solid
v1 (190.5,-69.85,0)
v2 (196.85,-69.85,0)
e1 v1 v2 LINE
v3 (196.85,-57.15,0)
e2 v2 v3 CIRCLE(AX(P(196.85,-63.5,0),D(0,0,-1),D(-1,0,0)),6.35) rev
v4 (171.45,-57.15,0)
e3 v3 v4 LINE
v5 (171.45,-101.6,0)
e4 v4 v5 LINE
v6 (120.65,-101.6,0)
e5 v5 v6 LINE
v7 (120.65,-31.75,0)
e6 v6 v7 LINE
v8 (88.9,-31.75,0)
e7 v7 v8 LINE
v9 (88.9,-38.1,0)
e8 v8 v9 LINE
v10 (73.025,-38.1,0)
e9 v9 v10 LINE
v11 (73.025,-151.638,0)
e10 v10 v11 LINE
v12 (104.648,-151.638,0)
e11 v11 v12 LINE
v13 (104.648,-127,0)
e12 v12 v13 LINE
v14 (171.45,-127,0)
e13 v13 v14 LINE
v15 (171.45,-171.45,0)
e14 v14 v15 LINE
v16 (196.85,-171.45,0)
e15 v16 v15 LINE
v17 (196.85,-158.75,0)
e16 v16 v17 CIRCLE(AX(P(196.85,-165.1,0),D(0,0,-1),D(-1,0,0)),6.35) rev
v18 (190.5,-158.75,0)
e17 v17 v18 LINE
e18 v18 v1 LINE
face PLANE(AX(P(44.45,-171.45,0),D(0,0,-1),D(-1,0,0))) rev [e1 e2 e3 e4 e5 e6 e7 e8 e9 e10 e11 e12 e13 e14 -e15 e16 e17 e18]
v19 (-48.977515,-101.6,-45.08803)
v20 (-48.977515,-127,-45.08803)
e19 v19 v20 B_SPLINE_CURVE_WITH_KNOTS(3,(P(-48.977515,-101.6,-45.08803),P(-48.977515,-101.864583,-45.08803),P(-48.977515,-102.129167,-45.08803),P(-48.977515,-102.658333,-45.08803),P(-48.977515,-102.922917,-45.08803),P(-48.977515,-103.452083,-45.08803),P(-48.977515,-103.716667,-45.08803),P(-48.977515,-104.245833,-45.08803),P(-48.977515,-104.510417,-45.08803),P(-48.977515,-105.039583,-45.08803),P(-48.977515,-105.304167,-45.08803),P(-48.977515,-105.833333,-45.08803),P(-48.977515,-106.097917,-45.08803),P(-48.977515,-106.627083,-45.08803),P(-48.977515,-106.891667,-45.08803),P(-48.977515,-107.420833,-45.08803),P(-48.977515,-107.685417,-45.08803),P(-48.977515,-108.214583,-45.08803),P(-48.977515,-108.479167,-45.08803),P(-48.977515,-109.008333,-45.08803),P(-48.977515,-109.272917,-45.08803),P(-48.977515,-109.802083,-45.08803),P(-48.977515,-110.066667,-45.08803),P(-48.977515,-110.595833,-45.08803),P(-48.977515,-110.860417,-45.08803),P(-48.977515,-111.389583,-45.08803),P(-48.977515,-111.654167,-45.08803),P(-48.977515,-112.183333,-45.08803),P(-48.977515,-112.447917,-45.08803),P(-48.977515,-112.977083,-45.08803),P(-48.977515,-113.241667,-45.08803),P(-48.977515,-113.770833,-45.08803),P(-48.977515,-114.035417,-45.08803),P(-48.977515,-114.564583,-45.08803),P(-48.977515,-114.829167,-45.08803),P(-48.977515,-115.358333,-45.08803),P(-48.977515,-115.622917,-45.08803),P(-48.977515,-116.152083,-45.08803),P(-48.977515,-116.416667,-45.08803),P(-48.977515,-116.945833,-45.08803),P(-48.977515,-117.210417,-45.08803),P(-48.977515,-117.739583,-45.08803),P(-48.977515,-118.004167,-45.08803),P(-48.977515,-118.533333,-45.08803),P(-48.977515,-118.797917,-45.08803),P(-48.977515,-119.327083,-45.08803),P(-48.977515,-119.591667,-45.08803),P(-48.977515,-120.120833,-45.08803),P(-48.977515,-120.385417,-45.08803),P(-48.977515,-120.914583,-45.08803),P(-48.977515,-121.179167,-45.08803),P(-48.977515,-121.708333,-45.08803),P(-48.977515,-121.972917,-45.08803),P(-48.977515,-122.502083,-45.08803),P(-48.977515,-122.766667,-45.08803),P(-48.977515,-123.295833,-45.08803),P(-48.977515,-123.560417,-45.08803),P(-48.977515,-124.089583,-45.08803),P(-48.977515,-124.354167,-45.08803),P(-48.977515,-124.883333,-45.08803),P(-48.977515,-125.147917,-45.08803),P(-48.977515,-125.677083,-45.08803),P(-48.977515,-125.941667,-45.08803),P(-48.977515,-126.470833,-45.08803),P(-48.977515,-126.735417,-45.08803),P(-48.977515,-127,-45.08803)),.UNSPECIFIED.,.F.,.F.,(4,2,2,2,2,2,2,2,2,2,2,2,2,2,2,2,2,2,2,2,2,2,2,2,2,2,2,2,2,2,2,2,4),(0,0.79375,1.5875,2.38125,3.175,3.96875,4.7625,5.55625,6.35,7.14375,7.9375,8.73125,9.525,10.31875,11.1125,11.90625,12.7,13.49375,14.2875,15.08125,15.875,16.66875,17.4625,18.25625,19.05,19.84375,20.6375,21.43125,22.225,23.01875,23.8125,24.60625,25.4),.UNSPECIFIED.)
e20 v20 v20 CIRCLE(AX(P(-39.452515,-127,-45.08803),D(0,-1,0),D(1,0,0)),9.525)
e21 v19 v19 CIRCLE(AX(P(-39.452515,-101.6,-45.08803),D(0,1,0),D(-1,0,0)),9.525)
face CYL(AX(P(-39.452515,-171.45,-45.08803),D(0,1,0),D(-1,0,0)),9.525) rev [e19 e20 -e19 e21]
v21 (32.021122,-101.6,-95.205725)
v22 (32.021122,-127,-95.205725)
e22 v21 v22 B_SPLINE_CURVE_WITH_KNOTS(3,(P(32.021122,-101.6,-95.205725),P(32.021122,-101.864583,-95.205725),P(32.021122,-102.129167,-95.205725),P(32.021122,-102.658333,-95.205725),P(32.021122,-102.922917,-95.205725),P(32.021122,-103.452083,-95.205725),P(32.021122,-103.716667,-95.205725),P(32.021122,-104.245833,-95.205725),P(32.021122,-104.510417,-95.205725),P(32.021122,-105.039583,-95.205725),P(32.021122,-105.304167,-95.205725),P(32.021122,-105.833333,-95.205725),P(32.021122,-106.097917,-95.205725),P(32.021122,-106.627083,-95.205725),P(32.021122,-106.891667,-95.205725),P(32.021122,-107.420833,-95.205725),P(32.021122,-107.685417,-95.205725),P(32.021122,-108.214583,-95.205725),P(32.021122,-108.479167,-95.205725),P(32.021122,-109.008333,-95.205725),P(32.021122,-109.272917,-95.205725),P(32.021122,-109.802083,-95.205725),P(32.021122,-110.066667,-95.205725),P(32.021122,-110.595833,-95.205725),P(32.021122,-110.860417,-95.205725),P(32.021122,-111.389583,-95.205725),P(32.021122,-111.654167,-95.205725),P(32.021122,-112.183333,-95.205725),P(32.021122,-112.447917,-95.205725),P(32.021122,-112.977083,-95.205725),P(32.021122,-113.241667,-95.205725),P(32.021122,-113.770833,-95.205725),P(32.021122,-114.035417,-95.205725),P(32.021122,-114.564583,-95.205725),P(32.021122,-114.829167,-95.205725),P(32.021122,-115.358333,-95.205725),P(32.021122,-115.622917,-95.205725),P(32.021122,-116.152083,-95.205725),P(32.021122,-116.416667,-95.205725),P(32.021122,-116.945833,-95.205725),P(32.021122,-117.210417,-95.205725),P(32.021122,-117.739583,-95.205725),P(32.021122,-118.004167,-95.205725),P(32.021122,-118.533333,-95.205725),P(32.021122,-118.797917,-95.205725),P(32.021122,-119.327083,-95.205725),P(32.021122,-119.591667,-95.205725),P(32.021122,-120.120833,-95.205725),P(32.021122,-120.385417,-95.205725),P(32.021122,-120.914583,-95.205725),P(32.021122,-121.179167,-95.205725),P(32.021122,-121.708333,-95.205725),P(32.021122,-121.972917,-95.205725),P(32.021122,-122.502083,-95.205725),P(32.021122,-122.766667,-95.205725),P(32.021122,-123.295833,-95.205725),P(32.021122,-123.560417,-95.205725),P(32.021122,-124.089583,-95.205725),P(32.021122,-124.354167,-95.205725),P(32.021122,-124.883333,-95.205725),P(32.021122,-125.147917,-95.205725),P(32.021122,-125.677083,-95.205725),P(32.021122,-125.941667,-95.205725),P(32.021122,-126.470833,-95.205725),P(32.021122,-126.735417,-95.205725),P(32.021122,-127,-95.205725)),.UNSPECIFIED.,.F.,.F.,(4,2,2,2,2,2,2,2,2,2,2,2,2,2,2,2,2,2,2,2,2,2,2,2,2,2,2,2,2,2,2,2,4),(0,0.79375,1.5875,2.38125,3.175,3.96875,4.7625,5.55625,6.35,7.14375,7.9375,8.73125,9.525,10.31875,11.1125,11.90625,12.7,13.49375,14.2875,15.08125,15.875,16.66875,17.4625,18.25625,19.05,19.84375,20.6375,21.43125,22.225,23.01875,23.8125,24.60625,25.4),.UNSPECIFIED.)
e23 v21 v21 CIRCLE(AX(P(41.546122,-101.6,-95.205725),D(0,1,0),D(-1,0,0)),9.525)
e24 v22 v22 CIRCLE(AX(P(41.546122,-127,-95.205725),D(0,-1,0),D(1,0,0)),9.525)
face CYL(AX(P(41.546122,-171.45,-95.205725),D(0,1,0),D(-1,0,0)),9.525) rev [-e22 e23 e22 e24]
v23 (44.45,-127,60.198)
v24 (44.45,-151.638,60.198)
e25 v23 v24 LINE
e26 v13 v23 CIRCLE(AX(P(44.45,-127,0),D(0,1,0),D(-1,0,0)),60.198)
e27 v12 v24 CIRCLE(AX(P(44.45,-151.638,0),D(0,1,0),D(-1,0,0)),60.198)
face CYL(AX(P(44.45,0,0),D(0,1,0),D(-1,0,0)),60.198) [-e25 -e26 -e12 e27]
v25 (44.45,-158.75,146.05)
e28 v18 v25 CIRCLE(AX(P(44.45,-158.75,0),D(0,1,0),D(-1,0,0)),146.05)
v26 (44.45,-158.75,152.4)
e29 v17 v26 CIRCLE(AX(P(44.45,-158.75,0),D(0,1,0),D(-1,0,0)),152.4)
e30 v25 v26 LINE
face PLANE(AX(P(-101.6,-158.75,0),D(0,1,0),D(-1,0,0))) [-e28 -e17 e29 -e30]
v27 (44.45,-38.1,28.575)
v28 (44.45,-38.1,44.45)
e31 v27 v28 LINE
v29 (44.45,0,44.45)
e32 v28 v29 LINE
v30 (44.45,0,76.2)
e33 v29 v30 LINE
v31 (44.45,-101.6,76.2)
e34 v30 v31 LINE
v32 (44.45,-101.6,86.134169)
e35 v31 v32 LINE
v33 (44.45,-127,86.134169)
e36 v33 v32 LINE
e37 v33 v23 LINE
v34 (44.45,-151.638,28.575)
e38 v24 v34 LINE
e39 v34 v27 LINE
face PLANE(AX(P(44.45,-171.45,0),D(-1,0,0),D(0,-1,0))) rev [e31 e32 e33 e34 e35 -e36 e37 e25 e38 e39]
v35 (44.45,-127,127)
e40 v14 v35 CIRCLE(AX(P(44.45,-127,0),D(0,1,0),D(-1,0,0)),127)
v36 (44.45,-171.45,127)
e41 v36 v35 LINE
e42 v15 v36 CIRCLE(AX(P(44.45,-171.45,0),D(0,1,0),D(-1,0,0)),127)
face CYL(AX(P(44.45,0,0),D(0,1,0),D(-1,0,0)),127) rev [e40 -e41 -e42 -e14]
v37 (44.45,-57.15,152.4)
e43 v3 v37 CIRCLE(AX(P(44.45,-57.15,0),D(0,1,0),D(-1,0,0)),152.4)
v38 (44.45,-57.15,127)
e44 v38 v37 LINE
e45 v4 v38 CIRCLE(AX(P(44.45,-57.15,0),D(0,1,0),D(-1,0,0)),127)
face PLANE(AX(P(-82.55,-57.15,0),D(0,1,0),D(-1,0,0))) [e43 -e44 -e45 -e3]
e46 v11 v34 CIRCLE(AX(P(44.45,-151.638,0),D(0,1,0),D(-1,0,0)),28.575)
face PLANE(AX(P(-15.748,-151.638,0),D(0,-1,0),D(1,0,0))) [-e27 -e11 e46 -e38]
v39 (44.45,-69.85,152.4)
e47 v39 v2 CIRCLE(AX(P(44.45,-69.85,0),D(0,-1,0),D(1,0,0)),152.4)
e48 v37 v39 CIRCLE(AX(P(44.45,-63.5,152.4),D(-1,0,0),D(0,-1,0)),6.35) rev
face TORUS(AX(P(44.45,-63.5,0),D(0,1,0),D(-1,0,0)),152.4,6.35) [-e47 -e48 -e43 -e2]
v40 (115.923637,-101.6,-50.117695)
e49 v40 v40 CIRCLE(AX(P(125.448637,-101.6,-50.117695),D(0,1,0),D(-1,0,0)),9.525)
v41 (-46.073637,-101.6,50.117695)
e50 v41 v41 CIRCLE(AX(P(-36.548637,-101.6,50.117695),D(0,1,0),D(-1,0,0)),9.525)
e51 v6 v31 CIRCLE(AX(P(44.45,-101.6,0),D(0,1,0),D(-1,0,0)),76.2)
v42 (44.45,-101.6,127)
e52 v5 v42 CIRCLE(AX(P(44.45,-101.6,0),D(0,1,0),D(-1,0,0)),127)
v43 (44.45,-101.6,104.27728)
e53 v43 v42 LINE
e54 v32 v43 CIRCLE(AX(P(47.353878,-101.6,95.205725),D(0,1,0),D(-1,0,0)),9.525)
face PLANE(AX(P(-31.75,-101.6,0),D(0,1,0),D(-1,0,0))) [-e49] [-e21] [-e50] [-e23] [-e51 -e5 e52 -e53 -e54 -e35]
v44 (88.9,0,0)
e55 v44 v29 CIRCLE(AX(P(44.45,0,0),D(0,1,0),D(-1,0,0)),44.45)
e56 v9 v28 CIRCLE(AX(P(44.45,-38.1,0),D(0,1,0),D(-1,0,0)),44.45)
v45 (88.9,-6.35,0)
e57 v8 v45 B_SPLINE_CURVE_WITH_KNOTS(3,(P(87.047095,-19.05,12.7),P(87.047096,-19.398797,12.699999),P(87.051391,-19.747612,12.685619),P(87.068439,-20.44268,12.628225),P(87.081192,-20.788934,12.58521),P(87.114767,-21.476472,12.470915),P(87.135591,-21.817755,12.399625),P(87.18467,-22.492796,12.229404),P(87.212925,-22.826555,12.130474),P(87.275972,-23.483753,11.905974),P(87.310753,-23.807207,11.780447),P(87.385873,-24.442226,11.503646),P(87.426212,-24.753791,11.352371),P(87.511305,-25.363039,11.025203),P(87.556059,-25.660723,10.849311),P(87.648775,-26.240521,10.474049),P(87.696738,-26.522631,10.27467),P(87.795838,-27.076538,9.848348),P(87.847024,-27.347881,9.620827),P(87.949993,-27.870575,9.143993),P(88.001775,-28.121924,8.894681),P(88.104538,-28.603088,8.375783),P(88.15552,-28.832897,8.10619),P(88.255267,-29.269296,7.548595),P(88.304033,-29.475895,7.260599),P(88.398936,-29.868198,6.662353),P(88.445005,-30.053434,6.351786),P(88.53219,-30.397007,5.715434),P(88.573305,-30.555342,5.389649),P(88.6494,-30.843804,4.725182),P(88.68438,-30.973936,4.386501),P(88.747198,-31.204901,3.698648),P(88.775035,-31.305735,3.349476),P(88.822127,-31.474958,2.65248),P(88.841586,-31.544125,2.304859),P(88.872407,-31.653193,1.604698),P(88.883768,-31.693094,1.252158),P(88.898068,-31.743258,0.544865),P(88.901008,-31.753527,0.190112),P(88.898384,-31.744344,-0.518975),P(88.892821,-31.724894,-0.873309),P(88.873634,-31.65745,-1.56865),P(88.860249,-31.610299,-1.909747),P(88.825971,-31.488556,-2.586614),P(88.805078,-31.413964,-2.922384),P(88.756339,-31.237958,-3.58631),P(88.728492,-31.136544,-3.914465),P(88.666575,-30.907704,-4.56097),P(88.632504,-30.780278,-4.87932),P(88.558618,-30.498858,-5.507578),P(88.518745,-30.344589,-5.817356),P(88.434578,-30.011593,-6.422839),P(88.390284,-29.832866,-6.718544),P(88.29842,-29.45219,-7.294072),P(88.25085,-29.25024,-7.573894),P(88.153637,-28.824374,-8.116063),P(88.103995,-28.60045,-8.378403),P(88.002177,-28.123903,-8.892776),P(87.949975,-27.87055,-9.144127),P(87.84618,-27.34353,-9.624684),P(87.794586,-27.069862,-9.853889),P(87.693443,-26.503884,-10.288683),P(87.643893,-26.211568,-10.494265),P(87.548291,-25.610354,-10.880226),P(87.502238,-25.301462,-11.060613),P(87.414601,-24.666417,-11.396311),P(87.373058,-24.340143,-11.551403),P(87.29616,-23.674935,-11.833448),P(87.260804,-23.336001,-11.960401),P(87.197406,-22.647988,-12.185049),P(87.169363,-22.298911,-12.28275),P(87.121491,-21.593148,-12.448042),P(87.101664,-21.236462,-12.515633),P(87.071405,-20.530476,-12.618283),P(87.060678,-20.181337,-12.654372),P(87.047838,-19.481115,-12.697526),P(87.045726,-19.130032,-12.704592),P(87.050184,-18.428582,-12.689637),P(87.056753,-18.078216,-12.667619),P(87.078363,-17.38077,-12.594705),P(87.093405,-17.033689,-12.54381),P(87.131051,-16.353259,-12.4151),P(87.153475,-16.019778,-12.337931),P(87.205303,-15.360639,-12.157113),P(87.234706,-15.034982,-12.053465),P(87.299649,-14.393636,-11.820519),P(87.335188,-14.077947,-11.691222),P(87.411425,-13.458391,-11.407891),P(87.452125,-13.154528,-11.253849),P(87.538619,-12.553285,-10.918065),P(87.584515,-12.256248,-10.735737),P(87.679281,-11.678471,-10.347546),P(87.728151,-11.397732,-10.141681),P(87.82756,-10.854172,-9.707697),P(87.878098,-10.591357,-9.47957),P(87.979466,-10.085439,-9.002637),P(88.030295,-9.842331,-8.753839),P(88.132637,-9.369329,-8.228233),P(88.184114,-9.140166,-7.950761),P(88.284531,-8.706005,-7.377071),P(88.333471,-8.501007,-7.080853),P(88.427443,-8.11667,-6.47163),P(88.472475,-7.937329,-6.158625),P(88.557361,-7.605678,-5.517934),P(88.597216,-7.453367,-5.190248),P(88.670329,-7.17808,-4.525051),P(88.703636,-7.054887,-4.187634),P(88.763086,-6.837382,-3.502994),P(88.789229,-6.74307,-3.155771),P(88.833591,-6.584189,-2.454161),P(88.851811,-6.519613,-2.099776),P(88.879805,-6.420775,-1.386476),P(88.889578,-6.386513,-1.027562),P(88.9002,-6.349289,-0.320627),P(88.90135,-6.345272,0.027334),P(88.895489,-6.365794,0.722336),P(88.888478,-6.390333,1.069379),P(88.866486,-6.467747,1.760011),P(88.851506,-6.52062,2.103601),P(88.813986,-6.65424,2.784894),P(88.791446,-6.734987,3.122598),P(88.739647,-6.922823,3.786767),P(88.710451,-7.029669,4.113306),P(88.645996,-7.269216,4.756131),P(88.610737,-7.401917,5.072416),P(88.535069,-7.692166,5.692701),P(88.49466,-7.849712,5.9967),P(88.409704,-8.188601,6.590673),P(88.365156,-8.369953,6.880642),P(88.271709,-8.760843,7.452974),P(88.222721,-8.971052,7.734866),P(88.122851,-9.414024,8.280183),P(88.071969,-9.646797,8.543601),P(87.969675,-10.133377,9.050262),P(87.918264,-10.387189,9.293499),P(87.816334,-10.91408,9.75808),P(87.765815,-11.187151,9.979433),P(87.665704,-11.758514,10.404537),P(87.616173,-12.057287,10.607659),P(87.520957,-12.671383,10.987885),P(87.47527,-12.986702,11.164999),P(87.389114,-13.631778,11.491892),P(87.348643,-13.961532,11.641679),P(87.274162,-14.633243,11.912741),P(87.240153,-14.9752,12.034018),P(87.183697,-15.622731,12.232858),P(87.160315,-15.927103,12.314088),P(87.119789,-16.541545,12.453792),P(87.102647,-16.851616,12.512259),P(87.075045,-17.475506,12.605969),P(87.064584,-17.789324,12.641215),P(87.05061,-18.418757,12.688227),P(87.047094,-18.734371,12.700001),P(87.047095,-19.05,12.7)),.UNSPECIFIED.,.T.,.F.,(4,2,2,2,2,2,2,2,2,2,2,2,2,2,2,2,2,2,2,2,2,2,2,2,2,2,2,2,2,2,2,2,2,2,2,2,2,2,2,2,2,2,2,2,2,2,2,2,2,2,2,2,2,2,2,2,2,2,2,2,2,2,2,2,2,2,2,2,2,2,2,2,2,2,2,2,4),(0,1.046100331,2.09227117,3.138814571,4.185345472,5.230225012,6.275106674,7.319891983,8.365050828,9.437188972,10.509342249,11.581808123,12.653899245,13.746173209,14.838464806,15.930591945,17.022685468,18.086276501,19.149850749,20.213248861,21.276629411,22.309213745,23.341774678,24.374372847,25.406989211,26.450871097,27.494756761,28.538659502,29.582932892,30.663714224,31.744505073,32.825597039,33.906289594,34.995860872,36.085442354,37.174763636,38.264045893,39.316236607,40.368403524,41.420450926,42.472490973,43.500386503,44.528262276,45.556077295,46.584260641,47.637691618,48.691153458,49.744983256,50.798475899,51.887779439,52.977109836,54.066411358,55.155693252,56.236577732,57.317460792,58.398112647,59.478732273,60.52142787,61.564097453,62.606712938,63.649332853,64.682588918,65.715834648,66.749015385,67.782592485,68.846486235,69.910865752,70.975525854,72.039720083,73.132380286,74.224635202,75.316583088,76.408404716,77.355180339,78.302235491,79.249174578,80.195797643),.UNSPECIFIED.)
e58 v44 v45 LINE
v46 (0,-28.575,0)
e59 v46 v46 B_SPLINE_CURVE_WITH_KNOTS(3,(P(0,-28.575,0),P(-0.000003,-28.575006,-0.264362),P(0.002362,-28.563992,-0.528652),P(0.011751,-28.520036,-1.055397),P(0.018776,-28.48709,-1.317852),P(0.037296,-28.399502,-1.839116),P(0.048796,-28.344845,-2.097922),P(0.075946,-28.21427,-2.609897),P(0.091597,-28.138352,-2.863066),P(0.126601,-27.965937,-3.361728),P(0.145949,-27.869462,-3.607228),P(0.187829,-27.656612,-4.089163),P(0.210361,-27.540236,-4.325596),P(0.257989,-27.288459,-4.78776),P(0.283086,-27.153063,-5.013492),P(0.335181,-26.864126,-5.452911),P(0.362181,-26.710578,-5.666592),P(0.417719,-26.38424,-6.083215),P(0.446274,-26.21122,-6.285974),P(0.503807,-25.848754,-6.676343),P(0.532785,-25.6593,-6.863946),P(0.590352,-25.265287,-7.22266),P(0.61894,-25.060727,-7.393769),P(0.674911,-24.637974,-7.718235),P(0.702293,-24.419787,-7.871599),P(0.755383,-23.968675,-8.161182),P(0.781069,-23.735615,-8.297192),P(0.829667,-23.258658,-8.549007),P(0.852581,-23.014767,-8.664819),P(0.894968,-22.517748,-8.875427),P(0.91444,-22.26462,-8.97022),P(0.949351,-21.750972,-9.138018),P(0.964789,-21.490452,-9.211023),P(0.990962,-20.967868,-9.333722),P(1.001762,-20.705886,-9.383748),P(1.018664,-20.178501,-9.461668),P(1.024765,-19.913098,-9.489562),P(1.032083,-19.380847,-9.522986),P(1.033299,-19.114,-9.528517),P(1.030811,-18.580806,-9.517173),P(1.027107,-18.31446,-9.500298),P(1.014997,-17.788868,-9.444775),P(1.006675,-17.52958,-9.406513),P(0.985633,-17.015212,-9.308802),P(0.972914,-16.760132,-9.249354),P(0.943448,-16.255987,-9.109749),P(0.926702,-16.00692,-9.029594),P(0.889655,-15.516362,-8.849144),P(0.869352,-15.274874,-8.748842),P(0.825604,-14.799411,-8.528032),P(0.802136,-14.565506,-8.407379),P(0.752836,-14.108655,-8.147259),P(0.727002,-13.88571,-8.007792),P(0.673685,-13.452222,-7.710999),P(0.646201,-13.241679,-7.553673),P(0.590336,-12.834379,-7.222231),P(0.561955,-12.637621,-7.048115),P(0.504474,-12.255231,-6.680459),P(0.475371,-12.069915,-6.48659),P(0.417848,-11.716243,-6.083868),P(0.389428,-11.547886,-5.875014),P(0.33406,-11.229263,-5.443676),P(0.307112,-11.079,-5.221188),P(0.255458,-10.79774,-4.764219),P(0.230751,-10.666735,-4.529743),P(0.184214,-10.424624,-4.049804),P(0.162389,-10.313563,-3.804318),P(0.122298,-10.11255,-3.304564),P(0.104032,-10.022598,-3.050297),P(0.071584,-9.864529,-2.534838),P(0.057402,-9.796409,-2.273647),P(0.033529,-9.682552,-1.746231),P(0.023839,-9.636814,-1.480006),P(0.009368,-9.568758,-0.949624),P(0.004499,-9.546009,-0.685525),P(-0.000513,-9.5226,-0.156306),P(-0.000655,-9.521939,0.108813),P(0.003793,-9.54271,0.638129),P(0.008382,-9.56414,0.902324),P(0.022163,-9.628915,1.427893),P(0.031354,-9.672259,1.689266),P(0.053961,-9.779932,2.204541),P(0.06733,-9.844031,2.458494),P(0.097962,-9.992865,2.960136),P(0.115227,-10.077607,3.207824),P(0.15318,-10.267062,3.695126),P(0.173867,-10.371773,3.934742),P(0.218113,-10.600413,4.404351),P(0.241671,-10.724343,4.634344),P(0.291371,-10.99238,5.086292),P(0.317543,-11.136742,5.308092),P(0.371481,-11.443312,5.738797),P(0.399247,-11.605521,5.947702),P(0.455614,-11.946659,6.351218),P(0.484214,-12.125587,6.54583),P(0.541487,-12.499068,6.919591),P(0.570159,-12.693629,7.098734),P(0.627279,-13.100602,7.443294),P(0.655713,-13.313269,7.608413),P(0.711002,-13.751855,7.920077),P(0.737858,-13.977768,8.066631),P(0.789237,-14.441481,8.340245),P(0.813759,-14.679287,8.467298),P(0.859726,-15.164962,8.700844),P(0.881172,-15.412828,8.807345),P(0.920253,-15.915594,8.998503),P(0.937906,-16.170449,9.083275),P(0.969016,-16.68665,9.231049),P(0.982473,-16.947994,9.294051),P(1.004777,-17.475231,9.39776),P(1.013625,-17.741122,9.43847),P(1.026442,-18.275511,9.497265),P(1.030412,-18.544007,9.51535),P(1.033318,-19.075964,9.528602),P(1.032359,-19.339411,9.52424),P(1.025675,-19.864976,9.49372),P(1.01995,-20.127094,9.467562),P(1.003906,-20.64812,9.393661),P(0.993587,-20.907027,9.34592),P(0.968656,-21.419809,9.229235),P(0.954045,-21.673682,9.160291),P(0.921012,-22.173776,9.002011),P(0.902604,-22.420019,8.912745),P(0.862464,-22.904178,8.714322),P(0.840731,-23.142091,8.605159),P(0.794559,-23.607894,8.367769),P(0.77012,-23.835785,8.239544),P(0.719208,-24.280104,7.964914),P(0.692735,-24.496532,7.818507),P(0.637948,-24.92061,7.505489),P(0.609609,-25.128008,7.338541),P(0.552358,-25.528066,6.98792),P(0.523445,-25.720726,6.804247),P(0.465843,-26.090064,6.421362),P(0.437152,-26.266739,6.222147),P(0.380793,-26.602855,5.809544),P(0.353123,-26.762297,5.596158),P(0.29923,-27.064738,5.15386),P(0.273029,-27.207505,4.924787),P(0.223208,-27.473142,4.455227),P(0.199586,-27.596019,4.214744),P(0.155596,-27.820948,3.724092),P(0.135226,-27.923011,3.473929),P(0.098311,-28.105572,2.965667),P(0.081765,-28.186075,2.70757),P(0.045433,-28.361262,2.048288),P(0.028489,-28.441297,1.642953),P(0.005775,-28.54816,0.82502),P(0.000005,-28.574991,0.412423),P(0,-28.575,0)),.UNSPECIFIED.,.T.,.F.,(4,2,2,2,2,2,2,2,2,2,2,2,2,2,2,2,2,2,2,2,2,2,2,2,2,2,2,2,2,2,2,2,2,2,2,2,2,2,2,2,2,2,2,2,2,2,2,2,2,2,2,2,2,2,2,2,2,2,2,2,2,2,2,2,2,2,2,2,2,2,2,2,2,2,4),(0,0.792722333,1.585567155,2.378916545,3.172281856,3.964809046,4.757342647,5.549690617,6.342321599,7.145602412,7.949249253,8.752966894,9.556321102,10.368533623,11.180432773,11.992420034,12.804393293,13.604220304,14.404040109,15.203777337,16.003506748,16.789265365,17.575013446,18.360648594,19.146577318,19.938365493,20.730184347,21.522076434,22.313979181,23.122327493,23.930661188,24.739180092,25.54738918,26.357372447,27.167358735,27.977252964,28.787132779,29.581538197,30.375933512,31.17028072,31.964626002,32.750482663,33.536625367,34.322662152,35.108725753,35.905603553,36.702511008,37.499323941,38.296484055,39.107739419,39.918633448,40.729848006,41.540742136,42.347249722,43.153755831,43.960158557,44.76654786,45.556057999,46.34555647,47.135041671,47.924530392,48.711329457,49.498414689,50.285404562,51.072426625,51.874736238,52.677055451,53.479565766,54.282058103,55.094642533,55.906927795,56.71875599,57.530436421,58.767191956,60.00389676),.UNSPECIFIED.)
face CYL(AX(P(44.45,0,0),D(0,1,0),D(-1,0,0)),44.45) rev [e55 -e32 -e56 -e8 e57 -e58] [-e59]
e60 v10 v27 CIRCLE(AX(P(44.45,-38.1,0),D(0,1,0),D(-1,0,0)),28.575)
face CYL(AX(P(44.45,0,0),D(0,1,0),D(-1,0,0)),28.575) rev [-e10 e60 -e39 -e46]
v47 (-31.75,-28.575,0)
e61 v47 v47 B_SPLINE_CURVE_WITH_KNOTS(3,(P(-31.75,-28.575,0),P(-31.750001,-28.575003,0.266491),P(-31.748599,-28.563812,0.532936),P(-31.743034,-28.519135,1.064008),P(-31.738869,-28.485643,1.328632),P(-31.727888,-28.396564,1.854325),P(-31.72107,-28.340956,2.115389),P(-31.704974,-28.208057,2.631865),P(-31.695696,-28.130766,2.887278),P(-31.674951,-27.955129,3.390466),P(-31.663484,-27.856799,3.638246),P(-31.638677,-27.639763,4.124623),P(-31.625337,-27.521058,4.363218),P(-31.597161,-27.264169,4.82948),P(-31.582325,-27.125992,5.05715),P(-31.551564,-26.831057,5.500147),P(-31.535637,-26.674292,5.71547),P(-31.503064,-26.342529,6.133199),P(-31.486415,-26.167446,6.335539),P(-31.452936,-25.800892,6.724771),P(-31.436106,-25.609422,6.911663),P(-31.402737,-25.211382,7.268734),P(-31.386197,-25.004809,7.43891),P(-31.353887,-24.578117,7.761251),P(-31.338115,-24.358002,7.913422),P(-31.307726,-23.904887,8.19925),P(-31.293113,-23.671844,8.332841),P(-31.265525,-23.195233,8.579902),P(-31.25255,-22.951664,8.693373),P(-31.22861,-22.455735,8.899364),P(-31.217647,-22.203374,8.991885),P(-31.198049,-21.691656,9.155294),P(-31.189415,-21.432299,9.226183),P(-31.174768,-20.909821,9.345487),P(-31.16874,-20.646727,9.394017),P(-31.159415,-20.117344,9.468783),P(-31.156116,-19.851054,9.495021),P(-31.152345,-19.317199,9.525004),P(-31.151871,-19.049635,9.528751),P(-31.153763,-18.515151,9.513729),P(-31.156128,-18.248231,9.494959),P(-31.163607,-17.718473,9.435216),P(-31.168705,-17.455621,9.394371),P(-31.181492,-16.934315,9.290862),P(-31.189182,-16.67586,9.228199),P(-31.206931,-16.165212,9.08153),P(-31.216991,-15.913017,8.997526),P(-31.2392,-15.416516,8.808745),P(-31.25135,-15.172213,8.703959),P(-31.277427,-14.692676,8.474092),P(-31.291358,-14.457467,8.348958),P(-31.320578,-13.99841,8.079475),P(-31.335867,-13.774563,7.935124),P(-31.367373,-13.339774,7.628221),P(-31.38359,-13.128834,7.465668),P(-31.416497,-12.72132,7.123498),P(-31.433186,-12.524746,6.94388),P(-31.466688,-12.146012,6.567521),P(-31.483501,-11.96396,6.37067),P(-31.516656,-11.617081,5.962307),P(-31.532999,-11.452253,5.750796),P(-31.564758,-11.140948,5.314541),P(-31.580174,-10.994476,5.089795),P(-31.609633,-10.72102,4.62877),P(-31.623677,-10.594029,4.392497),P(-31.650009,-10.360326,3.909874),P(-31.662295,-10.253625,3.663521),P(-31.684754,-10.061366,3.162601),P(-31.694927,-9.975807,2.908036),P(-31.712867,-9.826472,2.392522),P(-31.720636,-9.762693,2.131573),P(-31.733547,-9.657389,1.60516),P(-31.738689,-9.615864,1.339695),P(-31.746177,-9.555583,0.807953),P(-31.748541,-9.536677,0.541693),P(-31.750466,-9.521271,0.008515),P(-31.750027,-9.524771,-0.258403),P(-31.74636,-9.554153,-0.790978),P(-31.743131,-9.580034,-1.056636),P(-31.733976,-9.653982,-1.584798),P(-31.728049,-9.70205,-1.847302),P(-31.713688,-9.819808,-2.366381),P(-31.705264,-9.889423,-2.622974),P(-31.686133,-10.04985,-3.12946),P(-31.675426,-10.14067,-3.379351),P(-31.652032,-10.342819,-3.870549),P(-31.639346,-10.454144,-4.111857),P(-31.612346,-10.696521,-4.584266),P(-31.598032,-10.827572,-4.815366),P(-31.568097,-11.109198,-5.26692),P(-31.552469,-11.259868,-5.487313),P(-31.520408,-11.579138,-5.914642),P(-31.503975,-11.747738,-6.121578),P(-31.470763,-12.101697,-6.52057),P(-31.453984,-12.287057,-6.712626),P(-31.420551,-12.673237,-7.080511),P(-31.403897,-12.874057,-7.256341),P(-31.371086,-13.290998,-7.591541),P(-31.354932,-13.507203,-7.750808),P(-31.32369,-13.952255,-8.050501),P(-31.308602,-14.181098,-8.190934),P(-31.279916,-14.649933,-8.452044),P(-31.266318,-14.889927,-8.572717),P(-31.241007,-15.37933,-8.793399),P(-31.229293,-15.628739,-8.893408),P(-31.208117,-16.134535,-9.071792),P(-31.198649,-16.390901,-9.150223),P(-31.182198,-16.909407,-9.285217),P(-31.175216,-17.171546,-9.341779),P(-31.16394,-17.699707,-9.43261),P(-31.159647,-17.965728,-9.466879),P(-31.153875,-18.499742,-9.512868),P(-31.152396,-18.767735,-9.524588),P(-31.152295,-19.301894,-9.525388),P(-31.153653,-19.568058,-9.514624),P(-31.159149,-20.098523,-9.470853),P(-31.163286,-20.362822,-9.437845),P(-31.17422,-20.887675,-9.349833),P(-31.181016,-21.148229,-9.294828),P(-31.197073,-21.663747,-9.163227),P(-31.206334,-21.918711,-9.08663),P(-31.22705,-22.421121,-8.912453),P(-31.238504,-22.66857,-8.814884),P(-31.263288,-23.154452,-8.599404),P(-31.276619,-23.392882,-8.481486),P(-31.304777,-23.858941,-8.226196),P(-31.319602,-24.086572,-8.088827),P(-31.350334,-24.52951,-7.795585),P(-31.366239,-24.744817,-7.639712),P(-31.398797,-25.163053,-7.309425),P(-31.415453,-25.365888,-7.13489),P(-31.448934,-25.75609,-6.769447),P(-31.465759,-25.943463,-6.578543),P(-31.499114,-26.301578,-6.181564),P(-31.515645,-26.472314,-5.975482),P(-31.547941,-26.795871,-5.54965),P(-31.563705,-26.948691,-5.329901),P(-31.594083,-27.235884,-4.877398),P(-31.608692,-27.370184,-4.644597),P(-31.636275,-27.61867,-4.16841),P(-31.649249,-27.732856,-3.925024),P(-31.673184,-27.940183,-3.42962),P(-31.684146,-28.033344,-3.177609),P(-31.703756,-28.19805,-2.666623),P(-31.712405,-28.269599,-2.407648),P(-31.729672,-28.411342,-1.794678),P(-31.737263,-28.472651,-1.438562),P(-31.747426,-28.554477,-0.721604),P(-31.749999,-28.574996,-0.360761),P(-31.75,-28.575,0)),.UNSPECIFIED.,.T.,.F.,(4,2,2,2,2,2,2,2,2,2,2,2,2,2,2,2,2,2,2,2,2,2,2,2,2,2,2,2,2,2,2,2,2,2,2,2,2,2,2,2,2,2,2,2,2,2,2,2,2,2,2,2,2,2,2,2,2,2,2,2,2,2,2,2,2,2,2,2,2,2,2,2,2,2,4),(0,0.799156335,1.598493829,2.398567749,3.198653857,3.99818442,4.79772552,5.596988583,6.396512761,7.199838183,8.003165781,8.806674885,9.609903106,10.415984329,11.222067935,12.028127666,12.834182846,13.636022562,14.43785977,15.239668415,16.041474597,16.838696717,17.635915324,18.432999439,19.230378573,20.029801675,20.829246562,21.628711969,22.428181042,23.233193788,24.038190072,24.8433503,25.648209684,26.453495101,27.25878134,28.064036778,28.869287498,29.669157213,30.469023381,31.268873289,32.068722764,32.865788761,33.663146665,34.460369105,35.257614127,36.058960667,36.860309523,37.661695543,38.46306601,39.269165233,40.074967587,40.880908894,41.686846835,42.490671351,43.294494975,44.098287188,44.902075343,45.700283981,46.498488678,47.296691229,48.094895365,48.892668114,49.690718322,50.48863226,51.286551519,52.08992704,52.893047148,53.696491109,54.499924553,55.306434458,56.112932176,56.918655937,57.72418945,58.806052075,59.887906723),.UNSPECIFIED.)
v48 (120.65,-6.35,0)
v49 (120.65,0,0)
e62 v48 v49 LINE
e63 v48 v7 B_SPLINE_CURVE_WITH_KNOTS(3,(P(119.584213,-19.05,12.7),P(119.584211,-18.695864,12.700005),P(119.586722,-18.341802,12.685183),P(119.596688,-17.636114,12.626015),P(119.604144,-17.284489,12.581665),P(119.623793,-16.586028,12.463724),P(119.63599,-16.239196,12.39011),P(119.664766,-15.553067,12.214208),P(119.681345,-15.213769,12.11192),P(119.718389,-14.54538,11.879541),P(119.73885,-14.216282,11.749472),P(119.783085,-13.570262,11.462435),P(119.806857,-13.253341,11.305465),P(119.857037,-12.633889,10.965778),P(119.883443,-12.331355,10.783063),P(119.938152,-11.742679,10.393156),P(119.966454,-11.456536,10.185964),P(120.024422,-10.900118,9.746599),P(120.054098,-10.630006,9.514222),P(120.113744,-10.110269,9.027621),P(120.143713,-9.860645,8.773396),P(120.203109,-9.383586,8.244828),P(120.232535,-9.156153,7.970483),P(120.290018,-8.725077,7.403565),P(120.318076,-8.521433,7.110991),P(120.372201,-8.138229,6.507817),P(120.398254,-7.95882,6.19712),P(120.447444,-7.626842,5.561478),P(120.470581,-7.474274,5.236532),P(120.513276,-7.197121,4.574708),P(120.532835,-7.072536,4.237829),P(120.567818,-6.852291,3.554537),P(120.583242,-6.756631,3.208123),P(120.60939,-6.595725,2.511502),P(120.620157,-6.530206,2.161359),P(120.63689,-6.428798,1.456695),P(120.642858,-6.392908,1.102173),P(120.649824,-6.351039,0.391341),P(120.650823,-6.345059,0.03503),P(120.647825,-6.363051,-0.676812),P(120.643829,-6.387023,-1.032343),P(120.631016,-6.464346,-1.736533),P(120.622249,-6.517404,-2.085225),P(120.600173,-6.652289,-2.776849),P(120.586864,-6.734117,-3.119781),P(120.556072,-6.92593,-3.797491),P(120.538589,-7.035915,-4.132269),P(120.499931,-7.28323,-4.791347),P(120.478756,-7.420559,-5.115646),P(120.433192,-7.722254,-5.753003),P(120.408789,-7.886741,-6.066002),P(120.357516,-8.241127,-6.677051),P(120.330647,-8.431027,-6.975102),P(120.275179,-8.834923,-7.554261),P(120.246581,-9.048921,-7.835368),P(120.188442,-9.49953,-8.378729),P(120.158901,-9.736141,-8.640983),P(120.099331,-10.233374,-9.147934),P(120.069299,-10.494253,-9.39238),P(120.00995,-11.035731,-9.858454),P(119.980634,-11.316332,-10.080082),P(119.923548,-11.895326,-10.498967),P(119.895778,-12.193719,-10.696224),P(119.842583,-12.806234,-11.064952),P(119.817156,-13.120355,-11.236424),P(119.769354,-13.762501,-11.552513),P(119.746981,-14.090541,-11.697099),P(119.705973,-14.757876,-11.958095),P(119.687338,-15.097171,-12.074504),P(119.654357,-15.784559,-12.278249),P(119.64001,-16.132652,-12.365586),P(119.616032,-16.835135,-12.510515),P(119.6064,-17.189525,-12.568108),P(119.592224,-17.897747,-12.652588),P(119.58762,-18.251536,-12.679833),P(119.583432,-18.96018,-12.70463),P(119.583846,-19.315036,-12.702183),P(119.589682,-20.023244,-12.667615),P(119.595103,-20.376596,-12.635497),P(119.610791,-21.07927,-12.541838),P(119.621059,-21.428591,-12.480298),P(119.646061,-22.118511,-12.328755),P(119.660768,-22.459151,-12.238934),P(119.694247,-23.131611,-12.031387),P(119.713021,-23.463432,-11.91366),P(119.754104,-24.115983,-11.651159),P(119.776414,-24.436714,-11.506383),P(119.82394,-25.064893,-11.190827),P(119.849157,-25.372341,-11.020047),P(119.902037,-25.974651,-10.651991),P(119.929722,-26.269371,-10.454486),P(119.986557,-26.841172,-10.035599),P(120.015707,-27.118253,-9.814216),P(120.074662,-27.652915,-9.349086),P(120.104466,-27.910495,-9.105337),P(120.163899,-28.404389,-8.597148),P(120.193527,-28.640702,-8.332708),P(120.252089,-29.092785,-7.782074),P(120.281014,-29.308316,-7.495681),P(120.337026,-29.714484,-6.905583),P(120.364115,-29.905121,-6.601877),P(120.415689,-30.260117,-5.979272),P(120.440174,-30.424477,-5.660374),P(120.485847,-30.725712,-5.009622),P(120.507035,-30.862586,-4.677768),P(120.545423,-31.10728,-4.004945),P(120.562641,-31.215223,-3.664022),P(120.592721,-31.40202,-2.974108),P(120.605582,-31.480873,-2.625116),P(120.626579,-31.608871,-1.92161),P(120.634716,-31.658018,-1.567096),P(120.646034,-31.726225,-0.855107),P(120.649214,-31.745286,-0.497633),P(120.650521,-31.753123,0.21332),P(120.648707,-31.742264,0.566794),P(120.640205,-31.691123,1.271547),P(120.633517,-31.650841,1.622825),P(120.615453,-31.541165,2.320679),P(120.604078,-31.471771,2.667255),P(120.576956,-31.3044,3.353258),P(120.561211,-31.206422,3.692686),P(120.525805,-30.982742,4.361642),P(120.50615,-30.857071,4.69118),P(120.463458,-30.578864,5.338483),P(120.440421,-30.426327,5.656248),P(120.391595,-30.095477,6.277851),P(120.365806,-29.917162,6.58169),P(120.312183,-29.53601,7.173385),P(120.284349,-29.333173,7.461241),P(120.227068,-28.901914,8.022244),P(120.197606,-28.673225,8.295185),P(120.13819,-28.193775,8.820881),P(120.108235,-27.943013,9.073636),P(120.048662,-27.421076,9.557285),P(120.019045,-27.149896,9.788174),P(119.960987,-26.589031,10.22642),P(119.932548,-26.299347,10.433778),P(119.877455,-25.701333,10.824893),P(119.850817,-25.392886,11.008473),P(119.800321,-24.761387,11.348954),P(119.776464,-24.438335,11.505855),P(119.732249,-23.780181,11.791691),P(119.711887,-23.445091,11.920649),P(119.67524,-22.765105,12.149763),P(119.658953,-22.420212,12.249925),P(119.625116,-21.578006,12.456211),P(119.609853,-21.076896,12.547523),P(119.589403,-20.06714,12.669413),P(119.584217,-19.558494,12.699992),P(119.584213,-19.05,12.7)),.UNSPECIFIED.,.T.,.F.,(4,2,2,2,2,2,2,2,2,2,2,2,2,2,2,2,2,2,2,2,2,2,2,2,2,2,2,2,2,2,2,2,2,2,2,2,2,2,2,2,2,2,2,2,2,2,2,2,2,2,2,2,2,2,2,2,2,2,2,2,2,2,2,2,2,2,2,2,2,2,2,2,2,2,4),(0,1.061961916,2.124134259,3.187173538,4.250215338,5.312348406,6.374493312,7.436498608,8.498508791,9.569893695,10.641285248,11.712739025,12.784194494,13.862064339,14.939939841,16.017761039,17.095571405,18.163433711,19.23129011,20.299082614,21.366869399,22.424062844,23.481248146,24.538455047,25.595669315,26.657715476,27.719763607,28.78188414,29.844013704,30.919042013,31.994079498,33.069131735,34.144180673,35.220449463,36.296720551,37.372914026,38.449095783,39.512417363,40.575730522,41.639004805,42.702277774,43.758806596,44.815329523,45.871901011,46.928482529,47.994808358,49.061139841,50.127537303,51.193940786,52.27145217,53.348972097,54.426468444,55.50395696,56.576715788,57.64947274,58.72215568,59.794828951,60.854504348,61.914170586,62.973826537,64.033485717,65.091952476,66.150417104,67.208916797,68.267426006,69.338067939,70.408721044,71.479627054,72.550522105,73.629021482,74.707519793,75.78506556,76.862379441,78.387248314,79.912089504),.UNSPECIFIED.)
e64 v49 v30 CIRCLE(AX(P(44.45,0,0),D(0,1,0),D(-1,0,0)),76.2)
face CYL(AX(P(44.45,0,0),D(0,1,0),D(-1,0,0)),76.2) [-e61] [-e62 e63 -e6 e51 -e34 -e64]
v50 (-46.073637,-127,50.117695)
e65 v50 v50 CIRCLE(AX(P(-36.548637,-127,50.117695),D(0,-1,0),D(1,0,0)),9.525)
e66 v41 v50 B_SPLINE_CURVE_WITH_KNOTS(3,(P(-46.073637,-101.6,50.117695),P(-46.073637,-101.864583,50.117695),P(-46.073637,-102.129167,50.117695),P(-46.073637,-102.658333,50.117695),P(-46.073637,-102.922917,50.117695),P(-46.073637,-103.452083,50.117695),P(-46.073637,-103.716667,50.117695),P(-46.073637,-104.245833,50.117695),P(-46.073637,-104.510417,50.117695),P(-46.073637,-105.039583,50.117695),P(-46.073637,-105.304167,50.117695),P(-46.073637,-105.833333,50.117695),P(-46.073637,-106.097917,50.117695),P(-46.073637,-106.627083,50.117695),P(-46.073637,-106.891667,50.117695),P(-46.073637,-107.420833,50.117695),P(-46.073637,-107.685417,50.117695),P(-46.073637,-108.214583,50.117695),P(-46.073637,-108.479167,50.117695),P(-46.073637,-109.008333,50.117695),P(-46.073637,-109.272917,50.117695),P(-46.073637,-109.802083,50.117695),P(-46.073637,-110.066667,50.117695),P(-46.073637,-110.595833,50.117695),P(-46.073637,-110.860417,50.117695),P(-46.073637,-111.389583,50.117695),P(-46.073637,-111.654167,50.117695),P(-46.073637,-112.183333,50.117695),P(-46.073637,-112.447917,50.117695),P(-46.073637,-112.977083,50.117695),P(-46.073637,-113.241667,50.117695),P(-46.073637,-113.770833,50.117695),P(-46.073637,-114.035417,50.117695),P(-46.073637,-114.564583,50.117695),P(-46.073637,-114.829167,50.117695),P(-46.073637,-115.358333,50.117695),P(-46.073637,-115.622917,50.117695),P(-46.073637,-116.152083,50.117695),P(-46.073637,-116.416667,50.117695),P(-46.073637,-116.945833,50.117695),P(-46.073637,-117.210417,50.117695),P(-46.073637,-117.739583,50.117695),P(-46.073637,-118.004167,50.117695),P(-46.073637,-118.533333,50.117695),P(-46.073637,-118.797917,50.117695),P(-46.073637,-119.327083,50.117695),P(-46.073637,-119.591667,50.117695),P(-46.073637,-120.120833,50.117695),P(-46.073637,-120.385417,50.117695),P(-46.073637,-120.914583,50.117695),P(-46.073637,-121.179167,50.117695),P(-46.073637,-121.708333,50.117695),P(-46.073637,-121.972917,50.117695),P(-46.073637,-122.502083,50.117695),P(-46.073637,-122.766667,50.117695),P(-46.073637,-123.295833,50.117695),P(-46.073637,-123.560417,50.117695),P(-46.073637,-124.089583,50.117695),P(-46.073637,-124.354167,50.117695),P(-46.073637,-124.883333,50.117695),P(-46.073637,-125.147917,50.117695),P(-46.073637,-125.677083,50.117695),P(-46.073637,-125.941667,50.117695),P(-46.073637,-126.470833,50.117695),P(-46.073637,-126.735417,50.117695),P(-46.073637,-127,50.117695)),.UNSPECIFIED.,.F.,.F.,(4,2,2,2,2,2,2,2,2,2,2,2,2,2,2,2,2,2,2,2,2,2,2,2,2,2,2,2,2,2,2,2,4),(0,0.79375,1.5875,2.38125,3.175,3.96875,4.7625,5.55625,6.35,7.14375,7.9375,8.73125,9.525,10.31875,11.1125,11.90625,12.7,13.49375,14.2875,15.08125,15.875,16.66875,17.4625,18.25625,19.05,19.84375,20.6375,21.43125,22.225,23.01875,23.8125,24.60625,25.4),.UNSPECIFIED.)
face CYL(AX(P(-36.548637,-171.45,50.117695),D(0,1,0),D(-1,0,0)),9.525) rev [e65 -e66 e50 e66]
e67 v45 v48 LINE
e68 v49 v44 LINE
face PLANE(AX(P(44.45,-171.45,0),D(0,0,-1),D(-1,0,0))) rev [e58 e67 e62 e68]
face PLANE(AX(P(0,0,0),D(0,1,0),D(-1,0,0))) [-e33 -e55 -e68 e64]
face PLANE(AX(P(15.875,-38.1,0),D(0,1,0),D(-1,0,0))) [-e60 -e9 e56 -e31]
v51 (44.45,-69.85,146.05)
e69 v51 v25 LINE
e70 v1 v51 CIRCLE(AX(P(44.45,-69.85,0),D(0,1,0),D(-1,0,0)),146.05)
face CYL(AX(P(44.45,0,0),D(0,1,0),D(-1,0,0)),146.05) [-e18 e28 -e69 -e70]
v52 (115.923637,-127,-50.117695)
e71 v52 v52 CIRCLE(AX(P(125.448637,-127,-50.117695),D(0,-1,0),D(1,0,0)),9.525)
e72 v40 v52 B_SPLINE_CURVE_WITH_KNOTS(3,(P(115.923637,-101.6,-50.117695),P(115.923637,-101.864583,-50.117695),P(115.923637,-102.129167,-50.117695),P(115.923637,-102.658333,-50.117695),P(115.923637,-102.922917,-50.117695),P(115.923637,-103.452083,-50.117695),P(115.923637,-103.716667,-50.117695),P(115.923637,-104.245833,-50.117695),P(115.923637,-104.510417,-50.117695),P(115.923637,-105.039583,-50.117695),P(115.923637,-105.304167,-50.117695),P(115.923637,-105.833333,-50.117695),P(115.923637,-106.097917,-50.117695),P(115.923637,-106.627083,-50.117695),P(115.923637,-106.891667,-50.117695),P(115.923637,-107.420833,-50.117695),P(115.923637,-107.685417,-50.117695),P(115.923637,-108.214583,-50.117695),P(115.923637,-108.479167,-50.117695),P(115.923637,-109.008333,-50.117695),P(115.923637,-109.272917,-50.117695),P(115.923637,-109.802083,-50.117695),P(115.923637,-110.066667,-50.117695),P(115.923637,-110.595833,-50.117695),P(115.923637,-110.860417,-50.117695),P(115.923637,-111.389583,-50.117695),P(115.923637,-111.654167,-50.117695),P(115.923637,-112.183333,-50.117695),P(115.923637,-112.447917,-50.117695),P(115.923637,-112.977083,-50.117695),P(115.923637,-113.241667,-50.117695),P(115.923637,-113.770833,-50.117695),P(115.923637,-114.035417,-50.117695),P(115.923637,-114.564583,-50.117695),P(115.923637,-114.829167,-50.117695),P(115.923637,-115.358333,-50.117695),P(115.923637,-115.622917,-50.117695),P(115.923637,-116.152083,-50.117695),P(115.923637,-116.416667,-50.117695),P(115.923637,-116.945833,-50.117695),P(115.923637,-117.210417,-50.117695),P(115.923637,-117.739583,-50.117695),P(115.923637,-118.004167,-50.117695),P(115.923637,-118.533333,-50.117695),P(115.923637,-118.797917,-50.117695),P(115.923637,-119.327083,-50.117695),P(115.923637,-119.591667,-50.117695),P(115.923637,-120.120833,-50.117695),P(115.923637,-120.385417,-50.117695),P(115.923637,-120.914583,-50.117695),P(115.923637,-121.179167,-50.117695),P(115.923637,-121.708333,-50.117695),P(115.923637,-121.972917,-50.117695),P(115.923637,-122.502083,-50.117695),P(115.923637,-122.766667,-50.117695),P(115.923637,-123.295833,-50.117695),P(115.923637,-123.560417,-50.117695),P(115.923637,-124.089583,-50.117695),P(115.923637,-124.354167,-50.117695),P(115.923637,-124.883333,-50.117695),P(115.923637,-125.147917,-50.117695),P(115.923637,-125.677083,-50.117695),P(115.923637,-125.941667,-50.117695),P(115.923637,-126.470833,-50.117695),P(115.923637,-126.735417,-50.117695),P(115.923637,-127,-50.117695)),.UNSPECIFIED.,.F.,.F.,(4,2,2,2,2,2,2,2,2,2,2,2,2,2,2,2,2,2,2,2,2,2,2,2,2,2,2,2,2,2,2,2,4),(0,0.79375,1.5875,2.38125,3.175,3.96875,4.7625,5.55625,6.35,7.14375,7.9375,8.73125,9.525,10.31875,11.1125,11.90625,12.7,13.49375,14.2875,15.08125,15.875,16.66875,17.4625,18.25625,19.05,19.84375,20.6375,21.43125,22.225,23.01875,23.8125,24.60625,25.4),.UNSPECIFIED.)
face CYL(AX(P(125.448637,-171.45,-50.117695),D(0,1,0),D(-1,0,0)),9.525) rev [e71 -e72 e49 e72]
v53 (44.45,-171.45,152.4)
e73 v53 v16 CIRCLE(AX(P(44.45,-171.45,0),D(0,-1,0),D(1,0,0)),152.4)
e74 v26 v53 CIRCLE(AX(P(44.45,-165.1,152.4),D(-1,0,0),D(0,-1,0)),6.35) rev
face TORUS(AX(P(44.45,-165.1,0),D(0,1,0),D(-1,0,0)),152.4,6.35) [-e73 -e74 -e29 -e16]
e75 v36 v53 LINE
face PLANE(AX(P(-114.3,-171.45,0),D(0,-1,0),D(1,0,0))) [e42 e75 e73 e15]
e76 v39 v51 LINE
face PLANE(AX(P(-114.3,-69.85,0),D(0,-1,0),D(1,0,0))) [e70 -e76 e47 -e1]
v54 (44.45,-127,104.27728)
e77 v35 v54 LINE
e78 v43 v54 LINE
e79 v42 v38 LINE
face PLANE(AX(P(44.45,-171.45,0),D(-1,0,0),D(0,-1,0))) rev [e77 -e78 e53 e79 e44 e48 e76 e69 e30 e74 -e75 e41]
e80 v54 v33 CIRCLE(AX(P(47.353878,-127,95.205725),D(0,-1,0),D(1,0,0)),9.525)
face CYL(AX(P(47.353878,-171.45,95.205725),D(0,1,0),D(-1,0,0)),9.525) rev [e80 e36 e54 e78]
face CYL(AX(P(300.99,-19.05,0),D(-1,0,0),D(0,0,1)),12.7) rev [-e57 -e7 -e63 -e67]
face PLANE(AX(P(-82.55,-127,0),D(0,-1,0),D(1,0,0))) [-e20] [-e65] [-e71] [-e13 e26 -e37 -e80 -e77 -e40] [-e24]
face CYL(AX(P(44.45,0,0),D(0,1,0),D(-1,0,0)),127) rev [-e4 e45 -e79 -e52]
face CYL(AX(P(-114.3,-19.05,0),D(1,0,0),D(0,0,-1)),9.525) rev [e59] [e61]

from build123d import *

# Parameters (mm, degrees)
FILLET2_R                = 6.35
FILLET3_R                = 6.35
CUT_EXTRUDE1_DEPTH       = 278.154041177
CUT_EXTRUDE1_DEPTH_BACK  = 278.154041177
SKETCH2_R                = 9.525
CUT_EXTRUDE12_DEPTH      = 283.485800584
CUT_EXTRUDE12_DEPTH_BACK = 283.485800584
SKETCH6_R                = 9.525
SKETCH6_3_R              = 12.7
SKETCH6_3_R_2            = 9.525
CUT_EXTRUDE13_DEPTH      = 256.54
CUT_EXTRUDE10_DEPTH      = 291.299888117
CUT_EXTRUDE10_DEPTH_BACK = 291.299888117
SKETCH5_W                = 230.453515198
SKETCH5_H                = 214.151634883


with BuildPart() as part:
    # Sketch1 → Revolve1 (revolve)
    with BuildSketch(Plane.XY):
        Polygon((0, 0), (-31.75, 0), (-31.75, -101.6), (-82.55, -101.6), (-82.55, -57.15), (-114.3, -57.15), (-114.3, -69.85), (-101.6, -69.85), (-101.6, -158.75), (-114.3, -158.75), (-114.3, -171.45), (-82.55, -171.45), (-82.55, -127), (-15.748, -127), (-15.748, -151.638), (15.875, -151.638), (15.875, -38.1), (0, -38.1), align=None)
    revolve(axis=Axis((44.45, 0, 0), (0, -1, 0)))

    # Fillet2
    fillet2_edges = [part.edges().sort_by_distance(p)[0] for p in [
        (203.2, -171.45, 0),
        (203.2, -158.75, 0),
    ]]
    fillet(fillet2_edges, radius=FILLET2_R - 0.0001)  # a hair under: the kernel refuses the full size

    # Fillet3
    fillet3_edges = [part.edges().sort_by_distance(p)[0] for p in [
        (203.2, -69.85, 0),
        (203.2, -57.15, 0),
    ]]
    fillet(fillet3_edges, radius=FILLET3_R - 0.0001)  # a hair under: the kernel refuses the full size

    # Sketch2 → Cut-Extrude1 (cut, two sides: drawn at the far end of the back side and taken through both)
    with BuildSketch(Plane(origin=(0, -101.6, 0), x_dir=(1, 0, 0), z_dir=(0, 1, 0)).offset(-CUT_EXTRUDE1_DEPTH_BACK)):
        with Locations(Location((-36.548636908, -50.11769467, 0), (0, 0, 180))):
            Circle(SKETCH2_R)
        with Locations(Location((-39.452515217, 45.088029899, 0), (0, 0, 180))):
            Circle(SKETCH2_R)
        with Locations(Location((47.353878309, -95.205724569, 0), (0, 0, 180))):
            Circle(SKETCH2_R)
        with Locations(Location((125.448636908, 50.11769467, 0), (0, 0, 180))):
            Circle(SKETCH2_R)
        with Locations(Location((128.352515217, -45.088029899, 0), (0, 0, 180))):
            Circle(SKETCH2_R)
        with Locations(Location((41.546121691, 95.205724569, 0), (0, 0, 180))):
            Circle(SKETCH2_R)
    extrude(amount=CUT_EXTRUDE1_DEPTH + CUT_EXTRUDE1_DEPTH_BACK, mode=Mode.SUBTRACT)

    # Sketch6 → Cut-Extrude12 (cut, two sides: drawn at the far end of the back side and taken through both)
    with BuildSketch(Plane(origin=(44.45, 0, 0), x_dir=(0, 0, -1), z_dir=(1, 0, 0)).offset(-CUT_EXTRUDE12_DEPTH_BACK)):
        with Locations((0, -19.05)):
            Circle(SKETCH6_R)
    extrude(amount=CUT_EXTRUDE12_DEPTH + CUT_EXTRUDE12_DEPTH_BACK, mode=Mode.SUBTRACT)

    # Sketch6<3> → Cut-Extrude13 (cut)
    with BuildSketch(Plane(origin=(44.45, 0, 0), x_dir=(0, 0, -1), z_dir=(1, 0, 0))):
        with Locations(Location((0, -19.05, 0), (0, 0, 180))):
            Circle(SKETCH6_3_R)
        with Locations(Location((0, -19.05, 0), (0, 0, 270))):
            Circle(SKETCH6_3_R_2, mode=Mode.SUBTRACT)
    extrude(amount=CUT_EXTRUDE13_DEPTH, mode=Mode.SUBTRACT)

    # Sketch5 → Cut-Extrude10 (cut, two sides: drawn at the far end of the back side and taken through both)
    with BuildSketch(Plane(origin=(0, -38.1, 0), x_dir=(1, 0, 0), z_dir=(0, 1, 0)).offset(-CUT_EXTRUDE10_DEPTH_BACK)):
        with Locations((159.676757599, -107.075817442)):
            Rectangle(SKETCH5_W, SKETCH5_H)
    extrude(amount=CUT_EXTRUDE10_DEPTH + CUT_EXTRUDE10_DEPTH_BACK, mode=Mode.SUBTRACT)


solid = part.part
